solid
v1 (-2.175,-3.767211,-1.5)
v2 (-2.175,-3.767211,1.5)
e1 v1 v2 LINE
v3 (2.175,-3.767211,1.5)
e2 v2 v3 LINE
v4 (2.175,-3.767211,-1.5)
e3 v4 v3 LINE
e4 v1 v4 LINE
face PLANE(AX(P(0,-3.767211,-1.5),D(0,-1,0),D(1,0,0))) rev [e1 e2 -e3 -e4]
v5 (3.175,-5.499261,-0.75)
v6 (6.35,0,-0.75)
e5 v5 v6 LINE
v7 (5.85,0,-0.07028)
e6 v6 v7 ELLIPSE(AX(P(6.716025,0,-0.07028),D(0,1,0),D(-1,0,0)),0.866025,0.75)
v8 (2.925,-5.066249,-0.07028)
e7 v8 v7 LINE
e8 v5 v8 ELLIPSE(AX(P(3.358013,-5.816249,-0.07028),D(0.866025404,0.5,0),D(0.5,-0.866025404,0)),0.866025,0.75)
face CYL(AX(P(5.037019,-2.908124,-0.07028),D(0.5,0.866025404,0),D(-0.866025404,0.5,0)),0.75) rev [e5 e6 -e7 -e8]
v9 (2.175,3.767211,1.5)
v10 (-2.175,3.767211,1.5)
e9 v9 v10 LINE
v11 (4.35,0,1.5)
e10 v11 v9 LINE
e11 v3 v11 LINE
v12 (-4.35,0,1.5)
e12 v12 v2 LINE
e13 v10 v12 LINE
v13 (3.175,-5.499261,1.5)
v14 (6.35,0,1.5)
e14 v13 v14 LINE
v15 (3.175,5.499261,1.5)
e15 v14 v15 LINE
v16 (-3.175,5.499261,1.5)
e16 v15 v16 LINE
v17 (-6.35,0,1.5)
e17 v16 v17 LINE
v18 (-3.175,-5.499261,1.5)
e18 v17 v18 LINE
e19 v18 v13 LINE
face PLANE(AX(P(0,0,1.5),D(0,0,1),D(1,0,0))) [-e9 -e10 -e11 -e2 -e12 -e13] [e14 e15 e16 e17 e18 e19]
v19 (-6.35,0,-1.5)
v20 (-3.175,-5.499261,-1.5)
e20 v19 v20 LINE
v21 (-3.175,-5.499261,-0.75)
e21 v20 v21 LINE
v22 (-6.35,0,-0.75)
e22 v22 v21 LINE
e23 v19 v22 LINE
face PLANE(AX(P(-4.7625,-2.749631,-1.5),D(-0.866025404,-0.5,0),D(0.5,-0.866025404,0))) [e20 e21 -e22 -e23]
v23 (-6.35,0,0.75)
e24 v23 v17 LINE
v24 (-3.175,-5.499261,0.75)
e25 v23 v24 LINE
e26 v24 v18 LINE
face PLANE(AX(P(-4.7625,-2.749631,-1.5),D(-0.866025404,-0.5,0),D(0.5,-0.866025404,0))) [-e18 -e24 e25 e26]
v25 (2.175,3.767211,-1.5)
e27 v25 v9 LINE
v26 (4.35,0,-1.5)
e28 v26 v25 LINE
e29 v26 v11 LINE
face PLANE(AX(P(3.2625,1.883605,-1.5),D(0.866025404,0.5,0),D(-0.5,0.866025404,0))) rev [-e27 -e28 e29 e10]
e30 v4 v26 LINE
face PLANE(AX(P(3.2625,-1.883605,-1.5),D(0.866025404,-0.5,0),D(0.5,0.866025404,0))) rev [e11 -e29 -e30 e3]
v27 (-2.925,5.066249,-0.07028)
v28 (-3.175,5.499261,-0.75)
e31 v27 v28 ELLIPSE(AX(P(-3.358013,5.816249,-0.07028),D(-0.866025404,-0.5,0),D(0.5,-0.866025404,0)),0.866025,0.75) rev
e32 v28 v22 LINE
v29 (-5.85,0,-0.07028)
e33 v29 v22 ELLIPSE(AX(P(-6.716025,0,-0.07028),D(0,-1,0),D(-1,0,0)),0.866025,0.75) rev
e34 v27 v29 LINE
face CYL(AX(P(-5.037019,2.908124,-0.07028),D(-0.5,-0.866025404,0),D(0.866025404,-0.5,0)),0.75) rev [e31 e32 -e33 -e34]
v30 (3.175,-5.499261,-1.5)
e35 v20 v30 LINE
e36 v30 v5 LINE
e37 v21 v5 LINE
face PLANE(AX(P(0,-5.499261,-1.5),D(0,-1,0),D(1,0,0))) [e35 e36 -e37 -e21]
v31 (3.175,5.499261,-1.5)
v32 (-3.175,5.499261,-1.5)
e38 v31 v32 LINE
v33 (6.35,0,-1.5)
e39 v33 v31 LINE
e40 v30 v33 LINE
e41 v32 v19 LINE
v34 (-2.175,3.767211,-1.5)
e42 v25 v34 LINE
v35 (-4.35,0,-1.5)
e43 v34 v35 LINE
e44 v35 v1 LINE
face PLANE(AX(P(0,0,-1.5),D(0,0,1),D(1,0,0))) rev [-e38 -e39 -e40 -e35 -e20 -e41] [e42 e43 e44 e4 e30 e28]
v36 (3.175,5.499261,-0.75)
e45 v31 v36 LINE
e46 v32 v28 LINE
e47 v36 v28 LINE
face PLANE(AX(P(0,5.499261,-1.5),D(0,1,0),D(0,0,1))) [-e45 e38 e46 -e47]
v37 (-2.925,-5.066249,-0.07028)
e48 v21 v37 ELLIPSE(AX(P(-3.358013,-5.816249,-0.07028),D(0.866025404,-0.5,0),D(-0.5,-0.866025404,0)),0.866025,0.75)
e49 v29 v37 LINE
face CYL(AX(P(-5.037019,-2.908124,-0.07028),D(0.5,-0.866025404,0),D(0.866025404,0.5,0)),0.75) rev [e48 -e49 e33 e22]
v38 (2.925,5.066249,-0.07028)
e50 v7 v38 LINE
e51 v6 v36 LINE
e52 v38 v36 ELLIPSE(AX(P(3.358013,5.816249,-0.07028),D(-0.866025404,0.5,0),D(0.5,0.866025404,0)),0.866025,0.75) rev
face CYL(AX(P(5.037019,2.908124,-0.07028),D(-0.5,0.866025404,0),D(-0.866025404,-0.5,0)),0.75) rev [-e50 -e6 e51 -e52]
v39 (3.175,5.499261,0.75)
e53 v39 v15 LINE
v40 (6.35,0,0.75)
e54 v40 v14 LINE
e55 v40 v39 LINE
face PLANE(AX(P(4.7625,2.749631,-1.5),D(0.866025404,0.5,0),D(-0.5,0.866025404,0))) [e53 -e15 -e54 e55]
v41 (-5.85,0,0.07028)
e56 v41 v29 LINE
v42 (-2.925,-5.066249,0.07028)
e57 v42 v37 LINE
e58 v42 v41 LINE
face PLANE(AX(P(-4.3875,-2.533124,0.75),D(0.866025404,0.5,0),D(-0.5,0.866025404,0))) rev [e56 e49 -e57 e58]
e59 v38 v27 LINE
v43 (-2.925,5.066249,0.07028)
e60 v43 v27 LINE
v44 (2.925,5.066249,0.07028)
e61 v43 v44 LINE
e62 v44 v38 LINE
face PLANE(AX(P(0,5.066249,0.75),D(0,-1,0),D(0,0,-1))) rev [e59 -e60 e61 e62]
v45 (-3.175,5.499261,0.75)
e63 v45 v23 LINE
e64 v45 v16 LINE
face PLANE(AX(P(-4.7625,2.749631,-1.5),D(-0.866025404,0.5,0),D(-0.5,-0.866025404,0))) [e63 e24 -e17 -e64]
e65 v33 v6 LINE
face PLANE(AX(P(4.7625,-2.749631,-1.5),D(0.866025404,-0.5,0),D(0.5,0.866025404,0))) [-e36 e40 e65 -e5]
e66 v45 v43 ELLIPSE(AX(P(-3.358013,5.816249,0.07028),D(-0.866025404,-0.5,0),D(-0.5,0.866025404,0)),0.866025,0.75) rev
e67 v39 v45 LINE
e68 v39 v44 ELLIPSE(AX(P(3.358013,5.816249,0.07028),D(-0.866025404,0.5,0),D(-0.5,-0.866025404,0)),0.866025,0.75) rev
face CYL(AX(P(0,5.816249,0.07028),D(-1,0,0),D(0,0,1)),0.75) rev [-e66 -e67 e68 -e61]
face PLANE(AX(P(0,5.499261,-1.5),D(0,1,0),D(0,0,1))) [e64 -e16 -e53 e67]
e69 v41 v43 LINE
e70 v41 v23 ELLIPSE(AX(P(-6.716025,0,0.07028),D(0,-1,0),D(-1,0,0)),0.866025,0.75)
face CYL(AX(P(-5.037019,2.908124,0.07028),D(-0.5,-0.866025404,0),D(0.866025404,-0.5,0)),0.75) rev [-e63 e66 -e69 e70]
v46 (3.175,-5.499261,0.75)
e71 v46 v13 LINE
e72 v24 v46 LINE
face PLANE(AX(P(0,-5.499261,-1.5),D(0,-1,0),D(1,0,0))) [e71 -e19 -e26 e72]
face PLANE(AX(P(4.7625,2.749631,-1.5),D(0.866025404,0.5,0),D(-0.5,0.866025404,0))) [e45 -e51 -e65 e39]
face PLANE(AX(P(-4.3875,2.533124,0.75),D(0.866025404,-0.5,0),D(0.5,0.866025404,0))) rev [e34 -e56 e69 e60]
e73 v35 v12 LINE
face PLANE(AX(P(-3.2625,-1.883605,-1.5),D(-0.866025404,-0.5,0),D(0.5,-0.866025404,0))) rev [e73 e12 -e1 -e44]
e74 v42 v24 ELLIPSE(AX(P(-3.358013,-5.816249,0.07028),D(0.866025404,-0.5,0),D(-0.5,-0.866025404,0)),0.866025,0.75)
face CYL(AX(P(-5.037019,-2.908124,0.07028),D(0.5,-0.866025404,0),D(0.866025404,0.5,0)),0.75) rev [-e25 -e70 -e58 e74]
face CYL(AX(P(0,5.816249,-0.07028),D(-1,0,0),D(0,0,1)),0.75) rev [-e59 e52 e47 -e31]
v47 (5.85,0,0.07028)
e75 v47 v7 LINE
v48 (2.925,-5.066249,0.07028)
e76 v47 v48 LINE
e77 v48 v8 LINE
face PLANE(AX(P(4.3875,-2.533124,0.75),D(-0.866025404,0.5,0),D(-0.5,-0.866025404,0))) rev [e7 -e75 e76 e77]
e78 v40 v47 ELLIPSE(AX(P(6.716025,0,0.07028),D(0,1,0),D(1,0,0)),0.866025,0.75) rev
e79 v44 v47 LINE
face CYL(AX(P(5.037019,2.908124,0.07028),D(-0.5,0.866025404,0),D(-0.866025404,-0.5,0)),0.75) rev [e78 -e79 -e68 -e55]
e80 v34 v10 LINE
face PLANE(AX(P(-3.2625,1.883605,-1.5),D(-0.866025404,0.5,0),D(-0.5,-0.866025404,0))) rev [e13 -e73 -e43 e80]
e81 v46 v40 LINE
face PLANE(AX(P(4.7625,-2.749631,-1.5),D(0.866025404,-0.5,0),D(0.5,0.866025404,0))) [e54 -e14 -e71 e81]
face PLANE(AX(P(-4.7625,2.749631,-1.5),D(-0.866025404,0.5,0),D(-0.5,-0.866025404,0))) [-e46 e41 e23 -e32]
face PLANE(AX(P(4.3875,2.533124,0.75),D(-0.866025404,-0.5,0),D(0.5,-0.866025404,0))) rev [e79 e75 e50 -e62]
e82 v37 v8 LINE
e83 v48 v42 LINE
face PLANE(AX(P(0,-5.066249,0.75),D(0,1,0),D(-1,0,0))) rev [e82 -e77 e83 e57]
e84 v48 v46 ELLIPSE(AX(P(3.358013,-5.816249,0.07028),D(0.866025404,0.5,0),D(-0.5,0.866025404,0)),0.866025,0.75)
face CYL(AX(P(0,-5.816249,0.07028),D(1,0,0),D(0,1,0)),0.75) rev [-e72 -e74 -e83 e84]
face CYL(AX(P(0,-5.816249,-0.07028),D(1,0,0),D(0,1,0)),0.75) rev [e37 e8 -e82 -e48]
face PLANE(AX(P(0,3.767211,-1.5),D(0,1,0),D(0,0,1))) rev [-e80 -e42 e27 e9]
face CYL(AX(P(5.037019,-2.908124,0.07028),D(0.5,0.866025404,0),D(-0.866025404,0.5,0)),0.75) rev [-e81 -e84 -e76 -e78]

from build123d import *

# Parameters (mm, degrees)
BOSS_EXTRUDE2_DEPTH      = 1.5
BOSS_EXTRUDE2_DEPTH_BACK = 1.5
CUT_EXTRUDE1_DEPTH       = 0.75
CUT_EXTRUDE1_DEPTH_BACK  = 0.75
FILLET1_R                = 0.75


with BuildPart() as part:
    # Sketch1 → Boss-Extrude2 (new, two sides: drawn at the far end of the back side and taken through both)
    # profile 1 of 2: a face of its own
    with BuildSketch(Plane.XY.offset(-BOSS_EXTRUDE2_DEPTH_BACK)):
        Polygon((-3.175, -5.499261314), (3.175, -5.499261314), (6.35, 0), (3.175, 5.499261314), (-3.175, 5.499261314), (-6.35, 0), align=None)
        Polygon((2.925, -5.066248612), (5.85, 0), (2.925, 5.066248612), (-2.925, 5.066248612), (-5.85, 0), (-2.925, -5.066248612), align=None, mode=Mode.SUBTRACT)
    # profile 2 of 2: a face of its own
    with BuildSketch(Plane.XY.offset(-BOSS_EXTRUDE2_DEPTH_BACK)):
        Polygon((-2.925, -5.066248612), (2.925, -5.066248612), (5.85, 0), (2.925, 5.066248612), (-2.925, 5.066248612), (-5.85, 0), align=None)
        Polygon((2.175, -3.767210506), (4.35, 0), (2.175, 3.767210506), (-2.175, 3.767210506), (-4.35, 0), (-2.175, -3.767210506), align=None, mode=Mode.SUBTRACT)
    extrude(amount=BOSS_EXTRUDE2_DEPTH + BOSS_EXTRUDE2_DEPTH_BACK)

    # Sketch1<4> → Cut-Extrude1 (cut, two sides: drawn at the far end of the back side and taken through both)
    with BuildSketch(Plane.XY.offset(-CUT_EXTRUDE1_DEPTH_BACK)):
        Polygon((-3.175, -5.499261314), (3.175, -5.499261314), (6.35, 0), (3.175, 5.499261314), (-3.175, 5.499261314), (-6.35, 0), align=None)
        Polygon((2.925, -5.066248612), (5.85, 0), (2.925, 5.066248612), (-2.925, 5.066248612), (-5.85, 0), (-2.925, -5.066248612), align=None, mode=Mode.SUBTRACT)
    extrude(amount=CUT_EXTRUDE1_DEPTH + CUT_EXTRUDE1_DEPTH_BACK, mode=Mode.SUBTRACT)

    # Fillet1
    # the kernel refuses this fillet: 0.75 mm, written as the material it adds along each edge
    with BuildSketch(Plane(origin=(2.075350207, -6.537885222, 0.75), x_dir=(0.8660254037844385, -0.5000000000000001, 0), z_dir=(0.5000000000000001, 0.8660254037844387, 0))) as fillet1_piece_1_section:
        with BuildLine():
            CenterArc((0.75, 0.679719834), FILLET1_R, 180, 64.998010544)
            Line((0, 0.679719834), (0, 0))
            Line((0, 0), (0.433012702, 0))
        make_face()
    fillet1_piece_1 = extrude(amount=9.24859917, mode=Mode.PRIVATE)
    fillet1_piece_1 = split(fillet1_piece_1, bisect_by=Plane(origin=(2.075350207, -5.499261314, 0.75), z_dir=(0, 1, 0)), keep=Keep.TOP, mode=Mode.PRIVATE)
    fillet1_piece_1 = split(fillet1_piece_1, bisect_by=Plane(origin=(8.112324896, -3.05243626, 0.75), z_dir=(-0.8660254037844386, -0.5000000000000002, 0)), keep=Keep.TOP, mode=Mode.PRIVATE)
    fillet1_piece_1 = fillet1_piece_1 - Plane(origin=(2.075350207, -5.816248612, 0.070280166), x_dir=(0, 0.42264973081037627, 0.9062931121033175), z_dir=(-1, 0, 0)) * Cylinder(0.75, 22, mode=Mode.PRIVATE)
    fillet1_piece_1 = fillet1_piece_1 - Plane(origin=(8.386843949, -2.893942611, 0.070280166), x_dir=(-0.3660254037844377, -0.21132486540518658, 0.9062931121033191), z_dir=(0.5000000000000001, -0.8660254037844386, 0)) * Cylinder(0.75, 22, mode=Mode.PRIVATE)
    add(fillet1_piece_1)
    with BuildSketch(Plane(origin=(-4.624299585, -5.066248612, 0.75), x_dir=(0, -1, 0), z_dir=(1, 0, 0))) as fillet1_piece_2_section:
        with BuildLine():
            CenterArc((0.75, 0.679719834), FILLET1_R, 180, 64.998010544)
            Line((0, 0.679719834), (0, 0))
            Line((0, 0), (0.433012702, 0))
        make_face()
    fillet1_piece_2 = extrude(amount=9.24859917, mode=Mode.PRIVATE)
    fillet1_piece_2 = split(fillet1_piece_2, bisect_by=Plane(origin=(-3.724824896, -4.546936658, 0.75), z_dir=(0.8660254037844386, 0.5000000000000001, 0)), keep=Keep.TOP, mode=Mode.PRIVATE)
    fillet1_piece_2 = split(fillet1_piece_2, bisect_by=Plane(origin=(1.412675104, -8.551697574, 0.75), z_dir=(-0.8660254037844389, 0.4999999999999995, 0)), keep=Keep.TOP, mode=Mode.PRIVATE)
    fillet1_piece_2 = fillet1_piece_2 - Plane(origin=(1.687194157, -8.710191223, 0.070280166), x_dir=(-0.3660254037844373, 0.21132486540518636, 0.9062931121033192), z_dir=(-0.5000000000000001, -0.8660254037844386, 0)) * Cylinder(0.75, 22, mode=Mode.PRIVATE)
    fillet1_piece_2 = fillet1_piece_2 - Plane(origin=(-3.999343949, -4.705430307, 0.070280166), x_dir=(0.3660254037844385, 0.21132486540518705, 0.9062931121033185), z_dir=(-0.5000000000000001, 0.8660254037844386, 0)) * Cylinder(0.75, 22, mode=Mode.PRIVATE)
    add(fillet1_piece_2)
    with BuildSketch(Plane(origin=(-6.699649793, 1.471636609, 0.75), x_dir=(-0.8660254037844386, -0.5000000000000001, 0), z_dir=(0.5000000000000001, -0.8660254037844387, 0))) as fillet1_piece_3_section:
        with BuildLine():
            CenterArc((0.75, 0.679719834), FILLET1_R, 180, 64.998010544)
            Line((0, 0.679719834), (0, 0))
            Line((0, 0), (0.433012702, 0))
        make_face()
    fillet1_piece_3 = extrude(amount=9.24859917, mode=Mode.PRIVATE)
    fillet1_piece_3 = split(fillet1_piece_3, bisect_by=Plane(origin=(-6.699649793, -5.499261314, 0.75), z_dir=(0, 1, 0)), keep=Keep.TOP, mode=Mode.PRIVATE)
    fillet1_piece_3 = split(fillet1_piece_3, bisect_by=Plane(origin=(-5.800175104, 0.952324656, 0.75), z_dir=(0.8660254037844388, -0.4999999999999999, 0)), keep=Keep.TOP, mode=Mode.PRIVATE)
    fillet1_piece_3 = fillet1_piece_3 - Plane(origin=(-6.699649793, -5.816248612, 0.070280166), x_dir=(0, 0.42264973081037627, 0.9062931121033175), z_dir=(-1, 0, 0)) * Cylinder(0.75, 22, mode=Mode.PRIVATE)
    fillet1_piece_3 = fillet1_piece_3 - Plane(origin=(-6.074694157, 1.110818305, 0.070280166), x_dir=(0.36602540378443843, -0.21132486540518683, 0.9062931121033186), z_dir=(0.49999999999999967, 0.8660254037844388, 0)) * Cylinder(0.75, 22, mode=Mode.PRIVATE)
    add(fillet1_piece_3)
    with BuildSketch(Plane(origin=(-2.075350207, 6.537885222, 0.75), x_dir=(-0.8660254037844388, 0.49999999999999967, 0), z_dir=(-0.4999999999999997, -0.8660254037844388, 0))) as fillet1_piece_4_section:
        with BuildLine():
            CenterArc((0.75, 0.679719834), FILLET1_R, 180, 64.998010544)
            Line((0, 0.679719834), (0, 0))
            Line((0, 0), (0.433012702, 0))
        make_face()
    fillet1_piece_4 = extrude(amount=9.24859917, mode=Mode.PRIVATE)
    fillet1_piece_4 = split(fillet1_piece_4, bisect_by=Plane(origin=(-8.112324896, 3.05243626, 0.75), z_dir=(0.8660254037844386, 0.5000000000000001, 0)), keep=Keep.TOP, mode=Mode.PRIVATE)
    fillet1_piece_4 = split(fillet1_piece_4, bisect_by=Plane(origin=(-2.075350207, 5.499261314, 0.75), z_dir=(0, -1, 0)), keep=Keep.TOP, mode=Mode.PRIVATE)
    fillet1_piece_4 = fillet1_piece_4 - Plane(origin=(-8.386843949, 2.893942611, 0.070280166), x_dir=(0.3660254037844385, 0.21132486540518705, 0.9062931121033185), z_dir=(-0.5000000000000001, 0.8660254037844386, 0)) * Cylinder(0.75, 22, mode=Mode.PRIVATE)
    fillet1_piece_4 = fillet1_piece_4 - Plane(origin=(-2.075350207, 5.816248612, 0.070280166), x_dir=(0, -0.42264973081036916, 0.9062931121033209), z_dir=(1, 0, 0)) * Cylinder(0.75, 22, mode=Mode.PRIVATE)
    add(fillet1_piece_4)
    with BuildSketch(Plane(origin=(4.624299585, 5.066248612, 0.75), x_dir=(0, 1, 0), z_dir=(-1, 0, 0))) as fillet1_piece_5_section:
        with BuildLine():
            CenterArc((0.75, 0.679719834), FILLET1_R, 180, 64.998010544)
            Line((0, 0.679719834), (0, 0))
            Line((0, 0), (0.433012702, 0))
        make_face()
    fillet1_piece_5 = extrude(amount=9.24859917, mode=Mode.PRIVATE)
    fillet1_piece_5 = split(fillet1_piece_5, bisect_by=Plane(origin=(-1.412675104, 8.551697574, 0.75), z_dir=(0.8660254037844388, -0.4999999999999999, 0)), keep=Keep.TOP, mode=Mode.PRIVATE)
    fillet1_piece_5 = split(fillet1_piece_5, bisect_by=Plane(origin=(3.724824896, 4.546936658, 0.75), z_dir=(-0.8660254037844386, -0.5000000000000002, 0)), keep=Keep.TOP, mode=Mode.PRIVATE)
    fillet1_piece_5 = fillet1_piece_5 - Plane(origin=(-1.687194157, 8.710191223, 0.070280166), x_dir=(0.36602540378443843, -0.21132486540518683, 0.9062931121033186), z_dir=(0.49999999999999967, 0.8660254037844388, 0)) * Cylinder(0.75, 22, mode=Mode.PRIVATE)
    fillet1_piece_5 = fillet1_piece_5 - Plane(origin=(3.999343949, 4.705430307, 0.070280166), x_dir=(-0.3660254037844377, -0.21132486540518658, 0.9062931121033191), z_dir=(0.5000000000000001, -0.8660254037844386, 0)) * Cylinder(0.75, 22, mode=Mode.PRIVATE)
    add(fillet1_piece_5)
    with BuildSketch(Plane(origin=(6.699649793, -1.471636609, 0.75), x_dir=(0.8660254037844386, 0.5000000000000001, 0), z_dir=(-0.5000000000000001, 0.8660254037844387, 0))) as fillet1_piece_6_section:
        with BuildLine():
            CenterArc((0.75, 0.679719834), FILLET1_R, 180, 64.998010544)
            Line((0, 0.679719834), (0, 0))
            Line((0, 0), (0.433012702, 0))
        make_face()
    fillet1_piece_6 = extrude(amount=9.24859917, mode=Mode.PRIVATE)
    fillet1_piece_6 = split(fillet1_piece_6, bisect_by=Plane(origin=(5.800175104, -0.952324656, 0.75), z_dir=(-0.8660254037844389, 0.4999999999999995, 0)), keep=Keep.TOP, mode=Mode.PRIVATE)
    fillet1_piece_6 = split(fillet1_piece_6, bisect_by=Plane(origin=(6.699649793, 5.499261314, 0.75), z_dir=(0, -1, 0)), keep=Keep.TOP, mode=Mode.PRIVATE)
    fillet1_piece_6 = fillet1_piece_6 - Plane(origin=(6.074694157, -1.110818305, 0.070280166), x_dir=(-0.3660254037844373, 0.21132486540518636, 0.9062931121033192), z_dir=(-0.5000000000000001, -0.8660254037844386, 0)) * Cylinder(0.75, 22, mode=Mode.PRIVATE)
    fillet1_piece_6 = fillet1_piece_6 - Plane(origin=(6.699649793, 5.816248612, 0.070280166), x_dir=(0, -0.42264973081036916, 0.9062931121033209), z_dir=(1, 0, 0)) * Cylinder(0.75, 22, mode=Mode.PRIVATE)
    add(fillet1_piece_6)
    with BuildSketch(Plane(origin=(2.075350207, -6.537885222, -0.75), x_dir=(0, 0, 1), z_dir=(0.5000000000000001, 0.8660254037844387, 0))) as fillet1_piece_7_section:
        with BuildLine():
            CenterArc((0.679719834, 0.75), FILLET1_R, 205.001989456, 64.998010544)
            Line((0, 0.433012702), (0, 0))
            Line((0, 0), (0.679719834, 0))
        make_face()
    fillet1_piece_7 = extrude(amount=9.24859917, mode=Mode.PRIVATE)
    fillet1_piece_7 = split(fillet1_piece_7, bisect_by=Plane(origin=(2.075350207, -5.499261314, -0.75), z_dir=(0, 1, 0)), keep=Keep.TOP, mode=Mode.PRIVATE)
    fillet1_piece_7 = split(fillet1_piece_7, bisect_by=Plane(origin=(8.112324896, -3.05243626, -0.75), z_dir=(-0.8660254037844386, -0.5000000000000002, 0)), keep=Keep.TOP, mode=Mode.PRIVATE)
    fillet1_piece_7 = fillet1_piece_7 - Plane(origin=(8.386843949, -2.893942611, -0.070280166), x_dir=(-0.8660254037844387, -0.5000000000000001, 0), z_dir=(0.5000000000000001, -0.8660254037844387, 0)) * Cylinder(0.75, 22, mode=Mode.PRIVATE)
    fillet1_piece_7 = fillet1_piece_7 - Plane(origin=(2.075350207, -5.816248612, -0.070280166), x_dir=(0, 1, 0), z_dir=(-1, 0, 0)) * Cylinder(0.75, 22, mode=Mode.PRIVATE)
    add(fillet1_piece_7)
    with BuildSketch(Plane(origin=(6.699649793, -1.471636609, -0.75), x_dir=(0, 0, 1), z_dir=(-0.5000000000000001, 0.8660254037844387, 0))) as fillet1_piece_8_section:
        with BuildLine():
            CenterArc((0.679719834, 0.75), FILLET1_R, 205.001989456, 64.998010544)
            Line((0, 0.433012702), (0, 0))
            Line((0, 0), (0.679719834, 0))
        make_face()
    fillet1_piece_8 = extrude(amount=9.24859917, mode=Mode.PRIVATE)
    fillet1_piece_8 = split(fillet1_piece_8, bisect_by=Plane(origin=(5.800175104, -0.952324656, -0.75), z_dir=(-0.8660254037844389, 0.4999999999999995, 0)), keep=Keep.TOP, mode=Mode.PRIVATE)
    fillet1_piece_8 = split(fillet1_piece_8, bisect_by=Plane(origin=(6.699649793, 5.499261314, -0.75), z_dir=(0, -1, 0)), keep=Keep.TOP, mode=Mode.PRIVATE)
    fillet1_piece_8 = fillet1_piece_8 - Plane(origin=(6.074694157, -1.110818305, -0.070280166), x_dir=(-0.8660254037844387, 0.5000000000000001, 0), z_dir=(-0.5000000000000001, -0.8660254037844387, 0)) * Cylinder(0.75, 22, mode=Mode.PRIVATE)
    fillet1_piece_8 = fillet1_piece_8 - Plane(origin=(6.699649793, 5.816248612, -0.070280166), x_dir=(0, -1, 0), z_dir=(1, 0, 0)) * Cylinder(0.75, 22, mode=Mode.PRIVATE)
    add(fillet1_piece_8)
    with BuildSketch(Plane(origin=(4.624299585, 5.066248612, -0.75), x_dir=(0, 0, 1), z_dir=(-1, 0, 0))) as fillet1_piece_9_section:
        with BuildLine():
            CenterArc((0.679719834, 0.75), FILLET1_R, 205.001989456, 64.998010544)
            Line((0, 0.433012702), (0, 0))
            Line((0, 0), (0.679719834, 0))
        make_face()
    fillet1_piece_9 = extrude(amount=9.24859917, mode=Mode.PRIVATE)
    fillet1_piece_9 = split(fillet1_piece_9, bisect_by=Plane(origin=(3.724824896, 4.546936658, -0.75), z_dir=(-0.8660254037844386, -0.5000000000000002, 0)), keep=Keep.TOP, mode=Mode.PRIVATE)
    fillet1_piece_9 = split(fillet1_piece_9, bisect_by=Plane(origin=(-1.412675104, 8.551697574, -0.75), z_dir=(0.8660254037844388, -0.4999999999999999, 0)), keep=Keep.TOP, mode=Mode.PRIVATE)
    fillet1_piece_9 = fillet1_piece_9 - Plane(origin=(-1.687194157, 8.710191223, -0.070280166), x_dir=(0.8660254037844388, -0.4999999999999997, 0), z_dir=(0.4999999999999997, 0.8660254037844388, 0)) * Cylinder(0.75, 22, mode=Mode.PRIVATE)
    fillet1_piece_9 = fillet1_piece_9 - Plane(origin=(3.999343949, 4.705430307, -0.070280166), x_dir=(-0.8660254037844387, -0.5000000000000001, 0), z_dir=(0.5000000000000001, -0.8660254037844387, 0)) * Cylinder(0.75, 22, mode=Mode.PRIVATE)
    add(fillet1_piece_9)
    with BuildSketch(Plane(origin=(-2.075350207, 6.537885222, -0.75), x_dir=(0, 0, 1), z_dir=(-0.4999999999999997, -0.8660254037844388, 0))) as fillet1_piece_10_section:
        with BuildLine():
            CenterArc((0.679719834, 0.75), FILLET1_R, 205.001989456, 64.998010544)
            Line((0, 0.433012702), (0, 0))
            Line((0, 0), (0.679719834, 0))
        make_face()
    fillet1_piece_10 = extrude(amount=9.24859917, mode=Mode.PRIVATE)
    fillet1_piece_10 = split(fillet1_piece_10, bisect_by=Plane(origin=(-2.075350207, 5.499261314, -0.75), z_dir=(0, -1, 0)), keep=Keep.TOP, mode=Mode.PRIVATE)
    fillet1_piece_10 = split(fillet1_piece_10, bisect_by=Plane(origin=(-8.112324896, 3.05243626, -0.75), z_dir=(0.8660254037844386, 0.5000000000000001, 0)), keep=Keep.TOP, mode=Mode.PRIVATE)
    fillet1_piece_10 = fillet1_piece_10 - Plane(origin=(-8.386843949, 2.893942611, -0.070280166), x_dir=(0.8660254037844387, 0.5000000000000001, 0), z_dir=(-0.5000000000000001, 0.8660254037844387, 0)) * Cylinder(0.75, 22, mode=Mode.PRIVATE)
    fillet1_piece_10 = fillet1_piece_10 - Plane(origin=(-2.075350207, 5.816248612, -0.070280166), x_dir=(0, -1, 0), z_dir=(1, 0, 0)) * Cylinder(0.75, 22, mode=Mode.PRIVATE)
    add(fillet1_piece_10)
    with BuildSketch(Plane(origin=(-6.699649793, 1.471636609, -0.75), x_dir=(0, 0, 1), z_dir=(0.5000000000000001, -0.8660254037844387, 0))) as fillet1_piece_11_section:
        with BuildLine():
            CenterArc((0.679719834, 0.75), FILLET1_R, 205.001989456, 64.998010544)
            Line((0, 0.433012702), (0, 0))
            Line((0, 0), (0.679719834, 0))
        make_face()
    fillet1_piece_11 = extrude(amount=9.24859917, mode=Mode.PRIVATE)
    fillet1_piece_11 = split(fillet1_piece_11, bisect_by=Plane(origin=(-6.699649793, -5.499261314, -0.75), z_dir=(0, 1, 0)), keep=Keep.TOP, mode=Mode.PRIVATE)
    fillet1_piece_11 = split(fillet1_piece_11, bisect_by=Plane(origin=(-5.800175104, 0.952324656, -0.75), z_dir=(0.8660254037844388, -0.4999999999999999, 0)), keep=Keep.TOP, mode=Mode.PRIVATE)
    fillet1_piece_11 = fillet1_piece_11 - Plane(origin=(-6.074694157, 1.110818305, -0.070280166), x_dir=(0.8660254037844388, -0.4999999999999997, 0), z_dir=(0.4999999999999997, 0.8660254037844388, 0)) * Cylinder(0.75, 22, mode=Mode.PRIVATE)
    fillet1_piece_11 = fillet1_piece_11 - Plane(origin=(-6.699649793, -5.816248612, -0.070280166), x_dir=(0, 1, 0), z_dir=(-1, 0, 0)) * Cylinder(0.75, 22, mode=Mode.PRIVATE)
    add(fillet1_piece_11)
    with BuildSketch(Plane(origin=(-4.624299585, -5.066248612, -0.75), x_dir=(0, 0, 1), z_dir=(1, 0, 0))) as fillet1_piece_12_section:
        with BuildLine():
            CenterArc((0.679719834, 0.75), FILLET1_R, 205.001989456, 64.998010544)
            Line((0, 0.433012702), (0, 0))
            Line((0, 0), (0.679719834, 0))
        make_face()
    fillet1_piece_12 = extrude(amount=9.24859917, mode=Mode.PRIVATE)
    fillet1_piece_12 = split(fillet1_piece_12, bisect_by=Plane(origin=(1.412675104, -8.551697574, -0.75), z_dir=(-0.8660254037844389, 0.4999999999999995, 0)), keep=Keep.TOP, mode=Mode.PRIVATE)
    fillet1_piece_12 = split(fillet1_piece_12, bisect_by=Plane(origin=(-3.724824896, -4.546936658, -0.75), z_dir=(0.8660254037844386, 0.5000000000000001, 0)), keep=Keep.TOP, mode=Mode.PRIVATE)
    fillet1_piece_12 = fillet1_piece_12 - Plane(origin=(-3.999343949, -4.705430307, -0.070280166), x_dir=(0.8660254037844387, 0.5000000000000001, 0), z_dir=(-0.5000000000000001, 0.8660254037844387, 0)) * Cylinder(0.75, 22, mode=Mode.PRIVATE)
    fillet1_piece_12 = fillet1_piece_12 - Plane(origin=(1.687194157, -8.710191223, -0.070280166), x_dir=(-0.8660254037844387, 0.5000000000000001, 0), z_dir=(-0.5000000000000001, -0.8660254037844387, 0)) * Cylinder(0.75, 22, mode=Mode.PRIVATE)
    add(fillet1_piece_12)


solid = part.part
